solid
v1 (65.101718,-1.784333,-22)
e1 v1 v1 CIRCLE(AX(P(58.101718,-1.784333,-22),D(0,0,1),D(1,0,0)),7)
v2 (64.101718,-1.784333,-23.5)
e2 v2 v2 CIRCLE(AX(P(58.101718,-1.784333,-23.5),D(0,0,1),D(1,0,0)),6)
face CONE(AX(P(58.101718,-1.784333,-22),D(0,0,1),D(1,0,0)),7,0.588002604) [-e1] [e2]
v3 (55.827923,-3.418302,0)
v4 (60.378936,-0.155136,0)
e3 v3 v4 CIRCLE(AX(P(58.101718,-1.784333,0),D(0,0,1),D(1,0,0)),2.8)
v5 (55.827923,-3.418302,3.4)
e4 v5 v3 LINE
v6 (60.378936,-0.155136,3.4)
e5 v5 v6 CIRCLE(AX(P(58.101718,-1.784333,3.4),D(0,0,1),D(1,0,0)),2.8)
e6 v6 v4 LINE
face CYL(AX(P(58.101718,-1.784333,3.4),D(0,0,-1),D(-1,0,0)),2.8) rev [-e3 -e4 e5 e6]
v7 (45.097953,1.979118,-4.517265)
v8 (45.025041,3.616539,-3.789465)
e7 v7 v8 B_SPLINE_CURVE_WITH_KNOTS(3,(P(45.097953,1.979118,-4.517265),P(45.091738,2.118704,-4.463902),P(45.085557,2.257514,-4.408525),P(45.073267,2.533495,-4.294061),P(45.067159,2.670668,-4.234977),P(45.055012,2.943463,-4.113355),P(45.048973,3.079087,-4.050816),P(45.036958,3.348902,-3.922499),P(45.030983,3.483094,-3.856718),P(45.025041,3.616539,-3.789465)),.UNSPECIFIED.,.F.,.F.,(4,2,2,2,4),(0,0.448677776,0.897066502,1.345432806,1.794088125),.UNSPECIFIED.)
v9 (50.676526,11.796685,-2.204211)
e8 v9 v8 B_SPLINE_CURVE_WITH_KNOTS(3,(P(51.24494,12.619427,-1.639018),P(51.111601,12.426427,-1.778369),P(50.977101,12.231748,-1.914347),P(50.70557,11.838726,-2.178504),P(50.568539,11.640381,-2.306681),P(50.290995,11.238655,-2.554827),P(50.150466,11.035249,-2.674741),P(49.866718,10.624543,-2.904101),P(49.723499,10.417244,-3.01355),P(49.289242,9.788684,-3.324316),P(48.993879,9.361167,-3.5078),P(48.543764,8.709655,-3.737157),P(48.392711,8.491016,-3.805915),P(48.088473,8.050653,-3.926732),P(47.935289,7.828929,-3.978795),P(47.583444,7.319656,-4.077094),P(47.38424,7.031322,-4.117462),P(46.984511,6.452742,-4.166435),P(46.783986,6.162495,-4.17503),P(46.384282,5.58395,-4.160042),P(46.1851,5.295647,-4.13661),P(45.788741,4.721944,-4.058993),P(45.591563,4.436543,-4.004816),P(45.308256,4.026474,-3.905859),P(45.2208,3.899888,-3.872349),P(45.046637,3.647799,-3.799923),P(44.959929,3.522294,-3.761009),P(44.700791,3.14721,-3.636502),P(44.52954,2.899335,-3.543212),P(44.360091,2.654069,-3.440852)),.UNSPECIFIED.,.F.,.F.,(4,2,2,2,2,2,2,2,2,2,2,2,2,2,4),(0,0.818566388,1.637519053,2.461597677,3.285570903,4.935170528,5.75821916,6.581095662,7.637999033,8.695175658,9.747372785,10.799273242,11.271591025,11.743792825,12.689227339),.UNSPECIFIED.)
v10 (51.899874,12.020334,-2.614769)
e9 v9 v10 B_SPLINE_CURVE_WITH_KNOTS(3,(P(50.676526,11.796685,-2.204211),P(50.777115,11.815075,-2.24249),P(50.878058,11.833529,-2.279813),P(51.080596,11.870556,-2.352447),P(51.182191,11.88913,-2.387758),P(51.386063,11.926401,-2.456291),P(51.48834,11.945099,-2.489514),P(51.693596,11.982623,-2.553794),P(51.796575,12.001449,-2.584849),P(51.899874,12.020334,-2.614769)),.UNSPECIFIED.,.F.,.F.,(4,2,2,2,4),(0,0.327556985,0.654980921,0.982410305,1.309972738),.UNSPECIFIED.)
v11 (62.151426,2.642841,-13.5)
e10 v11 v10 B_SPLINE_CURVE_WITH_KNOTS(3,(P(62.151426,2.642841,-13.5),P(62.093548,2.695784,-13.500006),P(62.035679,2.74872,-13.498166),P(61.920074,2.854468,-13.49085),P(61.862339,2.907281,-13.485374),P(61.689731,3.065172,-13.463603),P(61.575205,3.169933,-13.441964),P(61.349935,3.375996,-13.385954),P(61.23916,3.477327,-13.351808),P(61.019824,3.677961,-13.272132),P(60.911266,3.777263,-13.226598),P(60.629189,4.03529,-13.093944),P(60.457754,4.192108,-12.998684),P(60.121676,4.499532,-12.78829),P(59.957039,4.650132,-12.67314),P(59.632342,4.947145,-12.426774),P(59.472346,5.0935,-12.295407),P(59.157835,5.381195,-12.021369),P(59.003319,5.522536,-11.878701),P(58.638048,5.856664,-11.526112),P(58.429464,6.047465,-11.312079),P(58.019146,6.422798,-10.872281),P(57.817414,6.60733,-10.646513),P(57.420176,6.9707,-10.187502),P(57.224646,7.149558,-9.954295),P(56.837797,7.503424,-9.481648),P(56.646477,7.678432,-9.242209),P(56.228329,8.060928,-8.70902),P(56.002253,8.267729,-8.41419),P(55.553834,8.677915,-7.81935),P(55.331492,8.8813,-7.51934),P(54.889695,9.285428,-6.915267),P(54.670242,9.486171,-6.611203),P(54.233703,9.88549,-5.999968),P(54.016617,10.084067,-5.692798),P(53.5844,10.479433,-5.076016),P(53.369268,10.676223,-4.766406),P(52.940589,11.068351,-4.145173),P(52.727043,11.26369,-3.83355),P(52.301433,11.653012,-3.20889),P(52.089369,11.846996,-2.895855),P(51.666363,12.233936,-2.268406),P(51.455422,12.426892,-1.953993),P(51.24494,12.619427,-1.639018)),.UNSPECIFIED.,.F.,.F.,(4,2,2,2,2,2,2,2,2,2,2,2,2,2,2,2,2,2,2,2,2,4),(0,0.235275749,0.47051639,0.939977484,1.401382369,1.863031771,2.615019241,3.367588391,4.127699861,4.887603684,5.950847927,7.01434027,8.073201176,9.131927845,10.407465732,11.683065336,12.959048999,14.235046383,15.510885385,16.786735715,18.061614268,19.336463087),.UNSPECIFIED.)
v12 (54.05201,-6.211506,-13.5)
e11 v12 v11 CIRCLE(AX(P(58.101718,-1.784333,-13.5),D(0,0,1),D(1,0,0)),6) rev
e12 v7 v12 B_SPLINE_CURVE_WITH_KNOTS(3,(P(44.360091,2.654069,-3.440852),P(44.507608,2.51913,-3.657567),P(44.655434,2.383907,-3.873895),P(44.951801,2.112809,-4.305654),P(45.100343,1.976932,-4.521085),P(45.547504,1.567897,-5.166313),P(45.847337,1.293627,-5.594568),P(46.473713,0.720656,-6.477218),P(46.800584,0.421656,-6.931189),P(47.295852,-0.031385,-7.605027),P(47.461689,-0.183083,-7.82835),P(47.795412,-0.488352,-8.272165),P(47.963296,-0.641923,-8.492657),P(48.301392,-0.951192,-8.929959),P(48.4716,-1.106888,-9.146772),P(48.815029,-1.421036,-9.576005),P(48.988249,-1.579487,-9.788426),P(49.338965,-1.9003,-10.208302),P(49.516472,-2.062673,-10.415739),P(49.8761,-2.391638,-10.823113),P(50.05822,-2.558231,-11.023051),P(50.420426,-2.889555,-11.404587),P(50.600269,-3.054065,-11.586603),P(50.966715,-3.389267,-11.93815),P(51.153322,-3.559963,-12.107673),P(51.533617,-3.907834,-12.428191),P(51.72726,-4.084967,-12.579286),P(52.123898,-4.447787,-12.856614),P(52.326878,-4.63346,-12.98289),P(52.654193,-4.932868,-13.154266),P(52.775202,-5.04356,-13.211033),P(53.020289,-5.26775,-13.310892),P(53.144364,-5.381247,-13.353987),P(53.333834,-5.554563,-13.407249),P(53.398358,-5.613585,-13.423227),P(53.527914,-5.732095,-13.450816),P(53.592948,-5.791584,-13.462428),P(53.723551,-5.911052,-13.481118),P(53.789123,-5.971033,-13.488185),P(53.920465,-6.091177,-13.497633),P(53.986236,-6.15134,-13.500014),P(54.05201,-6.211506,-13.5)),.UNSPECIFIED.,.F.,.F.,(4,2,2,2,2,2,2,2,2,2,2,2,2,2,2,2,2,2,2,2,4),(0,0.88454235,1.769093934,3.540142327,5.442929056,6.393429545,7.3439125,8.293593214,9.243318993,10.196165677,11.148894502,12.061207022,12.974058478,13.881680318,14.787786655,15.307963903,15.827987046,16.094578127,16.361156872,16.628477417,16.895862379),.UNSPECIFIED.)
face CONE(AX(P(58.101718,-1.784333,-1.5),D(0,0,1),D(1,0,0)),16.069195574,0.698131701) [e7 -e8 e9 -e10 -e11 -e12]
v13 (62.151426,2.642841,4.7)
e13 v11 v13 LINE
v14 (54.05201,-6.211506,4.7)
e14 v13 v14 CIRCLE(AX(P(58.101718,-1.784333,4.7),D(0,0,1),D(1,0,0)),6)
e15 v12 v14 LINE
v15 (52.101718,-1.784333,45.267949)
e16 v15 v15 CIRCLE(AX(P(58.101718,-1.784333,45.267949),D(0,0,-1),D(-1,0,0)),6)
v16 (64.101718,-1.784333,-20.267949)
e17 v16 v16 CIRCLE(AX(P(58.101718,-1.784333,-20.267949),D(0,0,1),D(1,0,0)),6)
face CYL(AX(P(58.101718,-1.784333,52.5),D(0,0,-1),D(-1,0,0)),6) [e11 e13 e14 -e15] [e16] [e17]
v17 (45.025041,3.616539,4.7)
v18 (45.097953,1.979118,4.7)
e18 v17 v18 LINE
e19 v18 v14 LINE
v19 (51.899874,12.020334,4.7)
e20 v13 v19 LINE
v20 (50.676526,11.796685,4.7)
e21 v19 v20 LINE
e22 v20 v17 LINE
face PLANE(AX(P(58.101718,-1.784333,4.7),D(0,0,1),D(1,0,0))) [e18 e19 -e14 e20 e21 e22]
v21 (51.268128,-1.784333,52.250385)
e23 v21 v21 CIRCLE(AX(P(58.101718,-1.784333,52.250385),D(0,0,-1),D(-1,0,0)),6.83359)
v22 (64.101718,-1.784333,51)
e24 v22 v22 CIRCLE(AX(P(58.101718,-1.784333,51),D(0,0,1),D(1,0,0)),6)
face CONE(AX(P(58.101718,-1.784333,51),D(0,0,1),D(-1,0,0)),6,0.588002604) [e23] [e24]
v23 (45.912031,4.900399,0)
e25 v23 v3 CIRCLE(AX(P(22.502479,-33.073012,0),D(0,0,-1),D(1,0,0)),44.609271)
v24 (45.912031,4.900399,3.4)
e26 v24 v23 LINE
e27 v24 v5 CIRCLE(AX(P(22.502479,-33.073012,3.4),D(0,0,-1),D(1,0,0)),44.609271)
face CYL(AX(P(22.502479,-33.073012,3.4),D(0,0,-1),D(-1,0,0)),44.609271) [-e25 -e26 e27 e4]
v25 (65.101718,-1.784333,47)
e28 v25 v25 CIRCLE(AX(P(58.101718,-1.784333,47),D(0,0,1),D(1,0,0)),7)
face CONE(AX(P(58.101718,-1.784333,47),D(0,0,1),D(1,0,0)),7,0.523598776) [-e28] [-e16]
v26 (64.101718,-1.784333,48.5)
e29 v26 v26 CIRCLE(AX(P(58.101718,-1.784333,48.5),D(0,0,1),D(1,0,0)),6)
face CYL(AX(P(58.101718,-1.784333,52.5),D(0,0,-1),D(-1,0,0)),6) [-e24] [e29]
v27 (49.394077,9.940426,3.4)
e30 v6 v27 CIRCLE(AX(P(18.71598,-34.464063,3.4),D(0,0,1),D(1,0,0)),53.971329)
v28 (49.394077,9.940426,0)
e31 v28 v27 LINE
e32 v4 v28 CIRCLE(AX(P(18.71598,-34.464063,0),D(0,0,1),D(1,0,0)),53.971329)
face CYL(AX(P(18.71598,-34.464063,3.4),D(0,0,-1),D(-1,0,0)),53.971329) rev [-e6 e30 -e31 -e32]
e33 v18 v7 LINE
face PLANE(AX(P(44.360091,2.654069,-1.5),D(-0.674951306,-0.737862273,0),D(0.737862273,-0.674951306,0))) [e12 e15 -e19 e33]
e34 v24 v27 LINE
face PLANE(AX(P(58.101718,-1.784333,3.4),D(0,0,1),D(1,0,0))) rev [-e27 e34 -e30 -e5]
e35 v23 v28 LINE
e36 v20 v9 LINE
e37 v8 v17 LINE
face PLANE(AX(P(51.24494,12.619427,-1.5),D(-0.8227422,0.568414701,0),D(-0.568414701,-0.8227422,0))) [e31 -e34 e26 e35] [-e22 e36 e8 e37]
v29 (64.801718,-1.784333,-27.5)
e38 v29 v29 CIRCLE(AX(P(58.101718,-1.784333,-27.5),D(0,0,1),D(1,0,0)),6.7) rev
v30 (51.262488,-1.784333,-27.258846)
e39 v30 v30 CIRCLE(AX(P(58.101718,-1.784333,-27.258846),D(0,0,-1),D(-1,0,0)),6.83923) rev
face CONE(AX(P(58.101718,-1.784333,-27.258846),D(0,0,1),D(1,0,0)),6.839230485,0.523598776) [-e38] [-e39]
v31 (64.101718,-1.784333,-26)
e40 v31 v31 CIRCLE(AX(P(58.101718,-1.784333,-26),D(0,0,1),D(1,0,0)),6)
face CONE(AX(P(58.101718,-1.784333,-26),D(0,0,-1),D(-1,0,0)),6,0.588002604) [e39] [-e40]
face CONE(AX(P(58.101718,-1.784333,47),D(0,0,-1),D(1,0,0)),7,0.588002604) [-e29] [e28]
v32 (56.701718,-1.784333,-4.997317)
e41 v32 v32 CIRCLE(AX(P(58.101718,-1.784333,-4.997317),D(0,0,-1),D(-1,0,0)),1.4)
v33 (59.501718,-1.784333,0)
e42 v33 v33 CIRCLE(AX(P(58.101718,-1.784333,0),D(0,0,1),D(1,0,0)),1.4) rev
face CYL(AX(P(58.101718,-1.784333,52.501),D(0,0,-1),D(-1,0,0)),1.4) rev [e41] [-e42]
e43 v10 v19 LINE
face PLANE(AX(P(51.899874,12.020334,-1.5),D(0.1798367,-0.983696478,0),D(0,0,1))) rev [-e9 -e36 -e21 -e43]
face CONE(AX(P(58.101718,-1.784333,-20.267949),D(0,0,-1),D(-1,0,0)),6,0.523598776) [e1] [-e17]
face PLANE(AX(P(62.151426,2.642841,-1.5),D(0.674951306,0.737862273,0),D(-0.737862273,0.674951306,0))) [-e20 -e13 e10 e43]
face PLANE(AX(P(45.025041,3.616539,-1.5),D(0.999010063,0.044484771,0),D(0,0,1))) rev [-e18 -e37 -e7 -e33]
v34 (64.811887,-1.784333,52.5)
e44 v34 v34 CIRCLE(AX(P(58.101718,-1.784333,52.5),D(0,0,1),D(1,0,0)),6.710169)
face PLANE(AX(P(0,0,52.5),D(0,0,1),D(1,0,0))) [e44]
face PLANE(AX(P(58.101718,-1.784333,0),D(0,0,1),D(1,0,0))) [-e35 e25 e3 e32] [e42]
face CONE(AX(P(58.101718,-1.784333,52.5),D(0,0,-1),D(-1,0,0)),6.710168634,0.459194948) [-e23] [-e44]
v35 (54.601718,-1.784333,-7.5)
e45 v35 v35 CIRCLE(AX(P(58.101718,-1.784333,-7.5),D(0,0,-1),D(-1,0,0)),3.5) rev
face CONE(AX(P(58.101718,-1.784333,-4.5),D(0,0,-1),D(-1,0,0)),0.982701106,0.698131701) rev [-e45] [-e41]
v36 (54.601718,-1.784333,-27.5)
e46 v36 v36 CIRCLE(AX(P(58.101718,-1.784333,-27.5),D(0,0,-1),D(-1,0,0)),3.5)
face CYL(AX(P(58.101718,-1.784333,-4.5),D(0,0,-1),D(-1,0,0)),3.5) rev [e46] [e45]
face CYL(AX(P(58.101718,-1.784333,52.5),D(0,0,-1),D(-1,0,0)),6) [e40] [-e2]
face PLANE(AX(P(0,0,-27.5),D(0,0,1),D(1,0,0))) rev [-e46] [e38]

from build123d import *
from OCP.BRepFilletAPI import BRepFilletAPI_MakeChamfer

# Parameters (mm, degrees)
BOSS_EXTRUDE1_DEPTH      = 3
SKETCH4_R                = 6
BOSS_EXTRUDE2_DEPTH      = 40
BOSS_EXTRUDE3_DEPTH      = 4.7
BOSS_EXTRUDE3_DEPTH_BACK = 1.5
CHAMFER1_START           = -13.500000159
CHAMFER1_DEPTH           = 12.000000159
CHAMFER1_2_ANGLE         = 180
CUT_EXTRUDE1_DEPTH       = 3.4
SKETCH9_R                = 1.4
CUT_EXTRUDE2_DEPTH       = 27.5
SKETCH10_R               = 3.5
CUT_EXTRUDE3_DEPTH       = 23
CHAMFER2_SIZE            = 3
CHAMFER2_SIZE_2          = 2.517298894
CHAMFER3_SIZE            = 1
CHAMFER3_SIZE2           = 1.169832114
CHAMFER3_SIZE2_2         = 0.887609284
CHAMFER4_SIZE            = 1.732050808
CHAMFER4_SIZE_2          = 1
CHAMFER5_SIZE            = 0.3
CHAMFER5_SIZE2           = 0.289831366


with BuildPart() as part:
    # Sketch3 → Boss-Extrude1 (new body)
    with BuildSketch(Plane.XY):
        with BuildLine():
            ThreePointArc((-21.06925633, 1.560185503), (-21.702383426, -4.120337722), (-16.861546239, -7.159332517))
            Line((-16.861546239, -7.159332517), (-16.235942246, -7.122800897))
            ThreePointArc((-16.235942246, -7.122800897), (-14.247317716, -6.480760333), (-12.653836147, -5.128850538))
            ThreePointArc((-12.653836147, -5.128850538), (21.262556938, 11.81913919), (56.062735888, -3.230898045))
            ThreePointArc((56.062735888, -3.230898045), (59.548283557, -3.823314658), (60.140700171, -0.337766989))
            ThreePointArc((60.140700171, -0.337766989), (19.96998669, 19.192613792), (-21.06925633, 1.560185503))
        make_face()
        Polygon((-14.842971244, -1.436629161), (-14.495267888, -1.784332517), (-14.848821278, -2.137885908), (-14.637840313, -2.550832882), (-15.083092963, -2.778319315), (-15.00954079, -3.236171091), (-15.503211236, -3.315477399), (-15.574237606, -3.773727796), (-16.068337858, -3.697144889), (-16.277038544, -4.111248976), (-16.723538831, -3.886221213), (-17.049626765, -4.215925369), (-17.405124343, -3.864326917), (-17.816901648, -4.077581746), (-18.046839834, -3.633590269), (-18.504279068, -3.70966601), (-18.586306367, -3.21644038), (-19.04494145, -3.147941973), (-18.971084274, -2.65342694), (-19.386332882, -2.447012878), (-19.163770631, -1.999278532), (-19.495267888, -1.67501361), (-19.145635065, -1.317582653), (-19.361157273, -0.906987537), (-18.918440472, -0.674604591), (-18.997037466, -0.217591808), (-18.504271649, -0.132846012), (-18.438303288, 0.326159812), (-17.94338851, 0.255030612), (-17.73926735, 0.671411115), (-17.290312559, 0.451321143), (-16.967880508, 0.784601421), (-16.60852704, 0.436944858), (-16.199126599, 0.654727893), (-15.964305958, 0.213299227), (-15.507733522, 0.294415085), (-15.420271807, -0.197875935), (-14.960909199, -0.261312244), (-15.029308259, -0.756611718), (-14.611808522, -0.958433771), align=None, mode=Mode.SUBTRACT)
    extrude(amount=BOSS_EXTRUDE1_DEPTH)


with BuildPart() as body_2:
    # Sketch4 → Boss-Extrude2 (new, symmetric)
    with BuildSketch(Plane.XY.offset(12.5)):
        with Locations((58.101718029, -1.784332517)):
            Circle(SKETCH4_R)
    extrude(amount=BOSS_EXTRUDE2_DEPTH, both=True)

    # Sketch8 → Boss-Extrude3 (add, two sides: drawn at the far end of the back side and taken through both)
    with BuildSketch(Plane.XY.offset(-BOSS_EXTRUDE3_DEPTH_BACK)):
        with BuildLine():
            Line((62.151425867, 2.642841122), (51.244940369, 12.619427404))
            Line((51.244940369, 12.619427404), (44.360090975, 2.654069132))
            Line((44.360090975, 2.654069132), (54.052010192, -6.211506156))
            ThreePointArc((54.052010192, -6.211506156), (62.528891669, -5.834040354), (62.151425867, 2.642841122))
        make_face()
    extrude(amount=BOSS_EXTRUDE3_DEPTH + BOSS_EXTRUDE3_DEPTH_BACK)

    # Chamfer1: read off the stored shape, not the designer's step
    # Chamfer1 outline → Chamfer1 (add)
    with BuildSketch(Plane.XY.offset(CHAMFER1_START)):
        with BuildLine():
            Line((51.244940369, 12.619427404), (44.360090975, 2.654069132))
            Line((44.360090975, 2.654069132), (54.052010192, -6.211506156))
            ThreePointArc((54.052010192, -6.211506156), (53.67454439, 2.265375321), (62.151425867, 2.642841122))
            Line((62.151425867, 2.642841122), (51.244940369, 12.619427404))
        make_face()
    extrude(amount=CHAMFER1_DEPTH)

    # Chamfer1 2 outline → Chamfer1 2 (revolve, cut)
    with BuildSketch(Plane(origin=(58.101718029, -1.784332517, 0), x_dir=(0.6749513062060508, 0.7378622732263427, 0), z_dir=(0.7378622732263427, -0.6749513062060508, 0))):
        Polygon((15.952545244, -1.63901845), (5.999993338, -13.500007939), (15.952545243, -13.500000159), align=None)
    revolve(axis=Axis((58.101718029, -1.784332517, 0), (0, 0, 1)), revolution_arc=CHAMFER1_2_ANGLE, mode=Mode.SUBTRACT)

    # Sketch6 → Cut-Extrude1 (cut)
    with BuildSketch(Plane.XY):
        with BuildLine():
            Line((-16.85267585, -7.459325585), (-16.209835721, -7.421787475))
            ThreePointArc((-16.209835721, -7.421787475), (-14.1052834, -6.74504216), (-12.418987212, -5.315521311))
            ThreePointArc((-12.418987212, -5.315521311), (21.262849062, 11.519032134), (55.827922983, -3.418301943))
            ThreePointArc((55.827922983, -3.418301943), (59.733301775, -4.059840039), (60.378935523, -0.155136246))
            ThreePointArc((60.378935523, -0.155136246), (19.977496019, 19.492520208), (-21.298028536, 1.754487883))
            ThreePointArc((-21.298028536, 1.754487883), (-21.97276199, -4.250320867), (-16.85267585, -7.459325585))
        make_face()
    extrude(amount=CUT_EXTRUDE1_DEPTH, mode=Mode.SUBTRACT)

    # Sketch9 → Cut-Extrude2 (cut)
    with BuildSketch(Plane(origin=(0, 0, -27.5), x_dir=(-1, 0, 0), z_dir=(0, 0, -1))):
        with Locations((-58.101718029, -1.784332517)):
            Circle(SKETCH9_R)
    extrude(amount=-CUT_EXTRUDE2_DEPTH, mode=Mode.SUBTRACT)

    # Sketch10 → Cut-Extrude3 (cut)
    with BuildSketch(Plane(origin=(0, 0, -27.5), x_dir=(-1, 0, 0), z_dir=(0, 0, -1))):
        with Locations((-58.101718029, -1.784332517)):
            Circle(SKETCH10_R)
    extrude(amount=-CUT_EXTRUDE3_DEPTH, mode=Mode.SUBTRACT)

    # Chamfer2
    # the kernel refuses this chamfer: 3, 2.517298894 mm, written as the material it adds along each edge
    with BuildSketch(Plane(origin=(58.101718029, -1.784332517, -4.5), x_dir=(-1, 0, 0), z_dir=(0, -1, 0))) as chamfer2_piece_1_section:
        Polygon((3.5, CHAMFER2_SIZE), (3.5 - CHAMFER2_SIZE_2, 0), (3.5, 0), align=None)
    chamfer2_piece_1 = revolve(axis=Axis((58.101718029, -1.784332517, -4.5), (0, 0, -1)), mode=Mode.PRIVATE)
    chamfer2_piece_1 = chamfer2_piece_1 - Plane(origin=(58.101718029, -1.784332517, -4.5), x_dir=(-1, 0, 0), z_dir=(0, 0, -1)) * Cylinder(1.4, 14, mode=Mode.PRIVATE)
    add(chamfer2_piece_1)

    # Sketch11 → Revolve1 (revolve)
    with BuildSketch(Plane(origin=(58.101718029, 0, 0), x_dir=(0, 0, -1), z_dir=(1, 0, 0)), mode=Mode.PRIVATE) as revolve1_sk:
        Polygon((27.5, -7.784332517), (27.5, -8.784332517), (26, -7.784332517), align=None)
        Polygon((23.5, -7.784332517), (22, -8.784332517), (22, -7.784332517), align=None)
    revolve1 = revolve(revolve1_sk.sketch.rotate(Axis((58.101718029, -1.784332517, 52.5), (0, 0, -1)), 270), axis=Axis((58.101718029, -1.784332517, 52.5), (0, 0, -1)))

    # Mirror1: Revolve1 across plane
    add(revolve1.mirror(Plane.XY.offset(12.5)))

    # Chamfer3: one chamfer whose edges measure the first distance from different faces: ONE call of the kernel's chamfer builder (chamfer() names one face for all edges)
    chamfer3_edges_1 = [body_2.edges().sort_by_distance(p)[0] for p in [
        (44.360090975, 2.654069132, 1.6),
    ]]
    chamfer3_side_1 = [body_2.faces().sort_by_distance(p)[0] for p in [
        (49.206050583, -1.778718512, 1.6),
    ]]
    chamfer3_edges_2 = [body_2.edges().sort_by_distance(p)[0] for p in [
        (51.244940369, 12.619427404, 1.6),
    ]]
    chamfer3_side_2 = [body_2.faces().sort_by_distance(p)[0] for p in [
        (47.802515672, 7.636748268, 4.563930343),
    ]]
    chamfer3 = BRepFilletAPI_MakeChamfer(body_2.part.solid().wrapped)
    for e in chamfer3_edges_1:
        chamfer3.Add(CHAMFER3_SIZE, CHAMFER3_SIZE2, e.wrapped, chamfer3_side_1[0].wrapped)  # the first distance lies on this face
    for e in chamfer3_edges_2:
        chamfer3.Add(CHAMFER3_SIZE, CHAMFER3_SIZE2_2, e.wrapped, chamfer3_side_2[0].wrapped)  # the first distance lies on this face
    add(Compound.cast(chamfer3.Shape()), mode=Mode.REPLACE)

    # Chamfer4
    # the kernel refuses this chamfer: 1.732050808, 1 mm, written as the material it adds along each edge
    with BuildSketch(Plane(origin=(58.101718029, -1.784332517, -22), x_dir=(1, 0, 0), z_dir=(0, 1, 0))) as chamfer4_piece_1:
        Polygon((6, -CHAMFER4_SIZE), (6 + CHAMFER4_SIZE_2, 0), (6, 0), align=None)
    revolve(axis=Axis((58.101718029, -1.784332517, -22), (0, 0, -1)))
    with BuildSketch(Plane(origin=(58.101718029, -1.784332517, 47), x_dir=(1, 0, 0), z_dir=(0, 1, 0))) as chamfer4_piece_2:
        Polygon((6, CHAMFER4_SIZE), (6 + CHAMFER4_SIZE_2, 0), (6, 0), align=None)
    revolve(axis=Axis((58.101718029, -1.784332517, 47), (0, 0, -1)))

    # Chamfer5: one chamfer whose edges measure the first distance from different faces: ONE call of the kernel's chamfer builder (chamfer() names one face for all edges)
    chamfer5_edges_1 = [body_2.edges().sort_by_distance(p)[0] for p in [
        (51.101718029, -1.784332517, -27.5),
    ]]
    chamfer5_side_1 = [body_2.faces().sort_by_distance(p)[0] for p in [
        (61.799707928, -1.784332517, -27.5),
    ]]
    chamfer5_edges_2 = [body_2.edges().sort_by_distance(p)[0] for p in [
        (51.101718029, -1.784332517, 52.5),
    ]]
    chamfer5_side_2 = [body_2.faces().sort_by_distance(p)[0] for p in [
        (51.601718029, -1.784332517, 51.75),
    ]]
    chamfer5 = BRepFilletAPI_MakeChamfer(body_2.part.solid().wrapped)
    for e in chamfer5_edges_1:
        chamfer5.Add(CHAMFER5_SIZE, CHAMFER5_SIZE2, e.wrapped, chamfer5_side_1[0].wrapped)  # the first distance lies on this face
    for e in chamfer5_edges_2:
        chamfer5.Add(CHAMFER5_SIZE, CHAMFER5_SIZE2, e.wrapped, chamfer5_side_2[0].wrapped)  # the first distance lies on this face
    add(Compound.cast(chamfer5.Shape()), mode=Mode.REPLACE)


solid = body_2.part
